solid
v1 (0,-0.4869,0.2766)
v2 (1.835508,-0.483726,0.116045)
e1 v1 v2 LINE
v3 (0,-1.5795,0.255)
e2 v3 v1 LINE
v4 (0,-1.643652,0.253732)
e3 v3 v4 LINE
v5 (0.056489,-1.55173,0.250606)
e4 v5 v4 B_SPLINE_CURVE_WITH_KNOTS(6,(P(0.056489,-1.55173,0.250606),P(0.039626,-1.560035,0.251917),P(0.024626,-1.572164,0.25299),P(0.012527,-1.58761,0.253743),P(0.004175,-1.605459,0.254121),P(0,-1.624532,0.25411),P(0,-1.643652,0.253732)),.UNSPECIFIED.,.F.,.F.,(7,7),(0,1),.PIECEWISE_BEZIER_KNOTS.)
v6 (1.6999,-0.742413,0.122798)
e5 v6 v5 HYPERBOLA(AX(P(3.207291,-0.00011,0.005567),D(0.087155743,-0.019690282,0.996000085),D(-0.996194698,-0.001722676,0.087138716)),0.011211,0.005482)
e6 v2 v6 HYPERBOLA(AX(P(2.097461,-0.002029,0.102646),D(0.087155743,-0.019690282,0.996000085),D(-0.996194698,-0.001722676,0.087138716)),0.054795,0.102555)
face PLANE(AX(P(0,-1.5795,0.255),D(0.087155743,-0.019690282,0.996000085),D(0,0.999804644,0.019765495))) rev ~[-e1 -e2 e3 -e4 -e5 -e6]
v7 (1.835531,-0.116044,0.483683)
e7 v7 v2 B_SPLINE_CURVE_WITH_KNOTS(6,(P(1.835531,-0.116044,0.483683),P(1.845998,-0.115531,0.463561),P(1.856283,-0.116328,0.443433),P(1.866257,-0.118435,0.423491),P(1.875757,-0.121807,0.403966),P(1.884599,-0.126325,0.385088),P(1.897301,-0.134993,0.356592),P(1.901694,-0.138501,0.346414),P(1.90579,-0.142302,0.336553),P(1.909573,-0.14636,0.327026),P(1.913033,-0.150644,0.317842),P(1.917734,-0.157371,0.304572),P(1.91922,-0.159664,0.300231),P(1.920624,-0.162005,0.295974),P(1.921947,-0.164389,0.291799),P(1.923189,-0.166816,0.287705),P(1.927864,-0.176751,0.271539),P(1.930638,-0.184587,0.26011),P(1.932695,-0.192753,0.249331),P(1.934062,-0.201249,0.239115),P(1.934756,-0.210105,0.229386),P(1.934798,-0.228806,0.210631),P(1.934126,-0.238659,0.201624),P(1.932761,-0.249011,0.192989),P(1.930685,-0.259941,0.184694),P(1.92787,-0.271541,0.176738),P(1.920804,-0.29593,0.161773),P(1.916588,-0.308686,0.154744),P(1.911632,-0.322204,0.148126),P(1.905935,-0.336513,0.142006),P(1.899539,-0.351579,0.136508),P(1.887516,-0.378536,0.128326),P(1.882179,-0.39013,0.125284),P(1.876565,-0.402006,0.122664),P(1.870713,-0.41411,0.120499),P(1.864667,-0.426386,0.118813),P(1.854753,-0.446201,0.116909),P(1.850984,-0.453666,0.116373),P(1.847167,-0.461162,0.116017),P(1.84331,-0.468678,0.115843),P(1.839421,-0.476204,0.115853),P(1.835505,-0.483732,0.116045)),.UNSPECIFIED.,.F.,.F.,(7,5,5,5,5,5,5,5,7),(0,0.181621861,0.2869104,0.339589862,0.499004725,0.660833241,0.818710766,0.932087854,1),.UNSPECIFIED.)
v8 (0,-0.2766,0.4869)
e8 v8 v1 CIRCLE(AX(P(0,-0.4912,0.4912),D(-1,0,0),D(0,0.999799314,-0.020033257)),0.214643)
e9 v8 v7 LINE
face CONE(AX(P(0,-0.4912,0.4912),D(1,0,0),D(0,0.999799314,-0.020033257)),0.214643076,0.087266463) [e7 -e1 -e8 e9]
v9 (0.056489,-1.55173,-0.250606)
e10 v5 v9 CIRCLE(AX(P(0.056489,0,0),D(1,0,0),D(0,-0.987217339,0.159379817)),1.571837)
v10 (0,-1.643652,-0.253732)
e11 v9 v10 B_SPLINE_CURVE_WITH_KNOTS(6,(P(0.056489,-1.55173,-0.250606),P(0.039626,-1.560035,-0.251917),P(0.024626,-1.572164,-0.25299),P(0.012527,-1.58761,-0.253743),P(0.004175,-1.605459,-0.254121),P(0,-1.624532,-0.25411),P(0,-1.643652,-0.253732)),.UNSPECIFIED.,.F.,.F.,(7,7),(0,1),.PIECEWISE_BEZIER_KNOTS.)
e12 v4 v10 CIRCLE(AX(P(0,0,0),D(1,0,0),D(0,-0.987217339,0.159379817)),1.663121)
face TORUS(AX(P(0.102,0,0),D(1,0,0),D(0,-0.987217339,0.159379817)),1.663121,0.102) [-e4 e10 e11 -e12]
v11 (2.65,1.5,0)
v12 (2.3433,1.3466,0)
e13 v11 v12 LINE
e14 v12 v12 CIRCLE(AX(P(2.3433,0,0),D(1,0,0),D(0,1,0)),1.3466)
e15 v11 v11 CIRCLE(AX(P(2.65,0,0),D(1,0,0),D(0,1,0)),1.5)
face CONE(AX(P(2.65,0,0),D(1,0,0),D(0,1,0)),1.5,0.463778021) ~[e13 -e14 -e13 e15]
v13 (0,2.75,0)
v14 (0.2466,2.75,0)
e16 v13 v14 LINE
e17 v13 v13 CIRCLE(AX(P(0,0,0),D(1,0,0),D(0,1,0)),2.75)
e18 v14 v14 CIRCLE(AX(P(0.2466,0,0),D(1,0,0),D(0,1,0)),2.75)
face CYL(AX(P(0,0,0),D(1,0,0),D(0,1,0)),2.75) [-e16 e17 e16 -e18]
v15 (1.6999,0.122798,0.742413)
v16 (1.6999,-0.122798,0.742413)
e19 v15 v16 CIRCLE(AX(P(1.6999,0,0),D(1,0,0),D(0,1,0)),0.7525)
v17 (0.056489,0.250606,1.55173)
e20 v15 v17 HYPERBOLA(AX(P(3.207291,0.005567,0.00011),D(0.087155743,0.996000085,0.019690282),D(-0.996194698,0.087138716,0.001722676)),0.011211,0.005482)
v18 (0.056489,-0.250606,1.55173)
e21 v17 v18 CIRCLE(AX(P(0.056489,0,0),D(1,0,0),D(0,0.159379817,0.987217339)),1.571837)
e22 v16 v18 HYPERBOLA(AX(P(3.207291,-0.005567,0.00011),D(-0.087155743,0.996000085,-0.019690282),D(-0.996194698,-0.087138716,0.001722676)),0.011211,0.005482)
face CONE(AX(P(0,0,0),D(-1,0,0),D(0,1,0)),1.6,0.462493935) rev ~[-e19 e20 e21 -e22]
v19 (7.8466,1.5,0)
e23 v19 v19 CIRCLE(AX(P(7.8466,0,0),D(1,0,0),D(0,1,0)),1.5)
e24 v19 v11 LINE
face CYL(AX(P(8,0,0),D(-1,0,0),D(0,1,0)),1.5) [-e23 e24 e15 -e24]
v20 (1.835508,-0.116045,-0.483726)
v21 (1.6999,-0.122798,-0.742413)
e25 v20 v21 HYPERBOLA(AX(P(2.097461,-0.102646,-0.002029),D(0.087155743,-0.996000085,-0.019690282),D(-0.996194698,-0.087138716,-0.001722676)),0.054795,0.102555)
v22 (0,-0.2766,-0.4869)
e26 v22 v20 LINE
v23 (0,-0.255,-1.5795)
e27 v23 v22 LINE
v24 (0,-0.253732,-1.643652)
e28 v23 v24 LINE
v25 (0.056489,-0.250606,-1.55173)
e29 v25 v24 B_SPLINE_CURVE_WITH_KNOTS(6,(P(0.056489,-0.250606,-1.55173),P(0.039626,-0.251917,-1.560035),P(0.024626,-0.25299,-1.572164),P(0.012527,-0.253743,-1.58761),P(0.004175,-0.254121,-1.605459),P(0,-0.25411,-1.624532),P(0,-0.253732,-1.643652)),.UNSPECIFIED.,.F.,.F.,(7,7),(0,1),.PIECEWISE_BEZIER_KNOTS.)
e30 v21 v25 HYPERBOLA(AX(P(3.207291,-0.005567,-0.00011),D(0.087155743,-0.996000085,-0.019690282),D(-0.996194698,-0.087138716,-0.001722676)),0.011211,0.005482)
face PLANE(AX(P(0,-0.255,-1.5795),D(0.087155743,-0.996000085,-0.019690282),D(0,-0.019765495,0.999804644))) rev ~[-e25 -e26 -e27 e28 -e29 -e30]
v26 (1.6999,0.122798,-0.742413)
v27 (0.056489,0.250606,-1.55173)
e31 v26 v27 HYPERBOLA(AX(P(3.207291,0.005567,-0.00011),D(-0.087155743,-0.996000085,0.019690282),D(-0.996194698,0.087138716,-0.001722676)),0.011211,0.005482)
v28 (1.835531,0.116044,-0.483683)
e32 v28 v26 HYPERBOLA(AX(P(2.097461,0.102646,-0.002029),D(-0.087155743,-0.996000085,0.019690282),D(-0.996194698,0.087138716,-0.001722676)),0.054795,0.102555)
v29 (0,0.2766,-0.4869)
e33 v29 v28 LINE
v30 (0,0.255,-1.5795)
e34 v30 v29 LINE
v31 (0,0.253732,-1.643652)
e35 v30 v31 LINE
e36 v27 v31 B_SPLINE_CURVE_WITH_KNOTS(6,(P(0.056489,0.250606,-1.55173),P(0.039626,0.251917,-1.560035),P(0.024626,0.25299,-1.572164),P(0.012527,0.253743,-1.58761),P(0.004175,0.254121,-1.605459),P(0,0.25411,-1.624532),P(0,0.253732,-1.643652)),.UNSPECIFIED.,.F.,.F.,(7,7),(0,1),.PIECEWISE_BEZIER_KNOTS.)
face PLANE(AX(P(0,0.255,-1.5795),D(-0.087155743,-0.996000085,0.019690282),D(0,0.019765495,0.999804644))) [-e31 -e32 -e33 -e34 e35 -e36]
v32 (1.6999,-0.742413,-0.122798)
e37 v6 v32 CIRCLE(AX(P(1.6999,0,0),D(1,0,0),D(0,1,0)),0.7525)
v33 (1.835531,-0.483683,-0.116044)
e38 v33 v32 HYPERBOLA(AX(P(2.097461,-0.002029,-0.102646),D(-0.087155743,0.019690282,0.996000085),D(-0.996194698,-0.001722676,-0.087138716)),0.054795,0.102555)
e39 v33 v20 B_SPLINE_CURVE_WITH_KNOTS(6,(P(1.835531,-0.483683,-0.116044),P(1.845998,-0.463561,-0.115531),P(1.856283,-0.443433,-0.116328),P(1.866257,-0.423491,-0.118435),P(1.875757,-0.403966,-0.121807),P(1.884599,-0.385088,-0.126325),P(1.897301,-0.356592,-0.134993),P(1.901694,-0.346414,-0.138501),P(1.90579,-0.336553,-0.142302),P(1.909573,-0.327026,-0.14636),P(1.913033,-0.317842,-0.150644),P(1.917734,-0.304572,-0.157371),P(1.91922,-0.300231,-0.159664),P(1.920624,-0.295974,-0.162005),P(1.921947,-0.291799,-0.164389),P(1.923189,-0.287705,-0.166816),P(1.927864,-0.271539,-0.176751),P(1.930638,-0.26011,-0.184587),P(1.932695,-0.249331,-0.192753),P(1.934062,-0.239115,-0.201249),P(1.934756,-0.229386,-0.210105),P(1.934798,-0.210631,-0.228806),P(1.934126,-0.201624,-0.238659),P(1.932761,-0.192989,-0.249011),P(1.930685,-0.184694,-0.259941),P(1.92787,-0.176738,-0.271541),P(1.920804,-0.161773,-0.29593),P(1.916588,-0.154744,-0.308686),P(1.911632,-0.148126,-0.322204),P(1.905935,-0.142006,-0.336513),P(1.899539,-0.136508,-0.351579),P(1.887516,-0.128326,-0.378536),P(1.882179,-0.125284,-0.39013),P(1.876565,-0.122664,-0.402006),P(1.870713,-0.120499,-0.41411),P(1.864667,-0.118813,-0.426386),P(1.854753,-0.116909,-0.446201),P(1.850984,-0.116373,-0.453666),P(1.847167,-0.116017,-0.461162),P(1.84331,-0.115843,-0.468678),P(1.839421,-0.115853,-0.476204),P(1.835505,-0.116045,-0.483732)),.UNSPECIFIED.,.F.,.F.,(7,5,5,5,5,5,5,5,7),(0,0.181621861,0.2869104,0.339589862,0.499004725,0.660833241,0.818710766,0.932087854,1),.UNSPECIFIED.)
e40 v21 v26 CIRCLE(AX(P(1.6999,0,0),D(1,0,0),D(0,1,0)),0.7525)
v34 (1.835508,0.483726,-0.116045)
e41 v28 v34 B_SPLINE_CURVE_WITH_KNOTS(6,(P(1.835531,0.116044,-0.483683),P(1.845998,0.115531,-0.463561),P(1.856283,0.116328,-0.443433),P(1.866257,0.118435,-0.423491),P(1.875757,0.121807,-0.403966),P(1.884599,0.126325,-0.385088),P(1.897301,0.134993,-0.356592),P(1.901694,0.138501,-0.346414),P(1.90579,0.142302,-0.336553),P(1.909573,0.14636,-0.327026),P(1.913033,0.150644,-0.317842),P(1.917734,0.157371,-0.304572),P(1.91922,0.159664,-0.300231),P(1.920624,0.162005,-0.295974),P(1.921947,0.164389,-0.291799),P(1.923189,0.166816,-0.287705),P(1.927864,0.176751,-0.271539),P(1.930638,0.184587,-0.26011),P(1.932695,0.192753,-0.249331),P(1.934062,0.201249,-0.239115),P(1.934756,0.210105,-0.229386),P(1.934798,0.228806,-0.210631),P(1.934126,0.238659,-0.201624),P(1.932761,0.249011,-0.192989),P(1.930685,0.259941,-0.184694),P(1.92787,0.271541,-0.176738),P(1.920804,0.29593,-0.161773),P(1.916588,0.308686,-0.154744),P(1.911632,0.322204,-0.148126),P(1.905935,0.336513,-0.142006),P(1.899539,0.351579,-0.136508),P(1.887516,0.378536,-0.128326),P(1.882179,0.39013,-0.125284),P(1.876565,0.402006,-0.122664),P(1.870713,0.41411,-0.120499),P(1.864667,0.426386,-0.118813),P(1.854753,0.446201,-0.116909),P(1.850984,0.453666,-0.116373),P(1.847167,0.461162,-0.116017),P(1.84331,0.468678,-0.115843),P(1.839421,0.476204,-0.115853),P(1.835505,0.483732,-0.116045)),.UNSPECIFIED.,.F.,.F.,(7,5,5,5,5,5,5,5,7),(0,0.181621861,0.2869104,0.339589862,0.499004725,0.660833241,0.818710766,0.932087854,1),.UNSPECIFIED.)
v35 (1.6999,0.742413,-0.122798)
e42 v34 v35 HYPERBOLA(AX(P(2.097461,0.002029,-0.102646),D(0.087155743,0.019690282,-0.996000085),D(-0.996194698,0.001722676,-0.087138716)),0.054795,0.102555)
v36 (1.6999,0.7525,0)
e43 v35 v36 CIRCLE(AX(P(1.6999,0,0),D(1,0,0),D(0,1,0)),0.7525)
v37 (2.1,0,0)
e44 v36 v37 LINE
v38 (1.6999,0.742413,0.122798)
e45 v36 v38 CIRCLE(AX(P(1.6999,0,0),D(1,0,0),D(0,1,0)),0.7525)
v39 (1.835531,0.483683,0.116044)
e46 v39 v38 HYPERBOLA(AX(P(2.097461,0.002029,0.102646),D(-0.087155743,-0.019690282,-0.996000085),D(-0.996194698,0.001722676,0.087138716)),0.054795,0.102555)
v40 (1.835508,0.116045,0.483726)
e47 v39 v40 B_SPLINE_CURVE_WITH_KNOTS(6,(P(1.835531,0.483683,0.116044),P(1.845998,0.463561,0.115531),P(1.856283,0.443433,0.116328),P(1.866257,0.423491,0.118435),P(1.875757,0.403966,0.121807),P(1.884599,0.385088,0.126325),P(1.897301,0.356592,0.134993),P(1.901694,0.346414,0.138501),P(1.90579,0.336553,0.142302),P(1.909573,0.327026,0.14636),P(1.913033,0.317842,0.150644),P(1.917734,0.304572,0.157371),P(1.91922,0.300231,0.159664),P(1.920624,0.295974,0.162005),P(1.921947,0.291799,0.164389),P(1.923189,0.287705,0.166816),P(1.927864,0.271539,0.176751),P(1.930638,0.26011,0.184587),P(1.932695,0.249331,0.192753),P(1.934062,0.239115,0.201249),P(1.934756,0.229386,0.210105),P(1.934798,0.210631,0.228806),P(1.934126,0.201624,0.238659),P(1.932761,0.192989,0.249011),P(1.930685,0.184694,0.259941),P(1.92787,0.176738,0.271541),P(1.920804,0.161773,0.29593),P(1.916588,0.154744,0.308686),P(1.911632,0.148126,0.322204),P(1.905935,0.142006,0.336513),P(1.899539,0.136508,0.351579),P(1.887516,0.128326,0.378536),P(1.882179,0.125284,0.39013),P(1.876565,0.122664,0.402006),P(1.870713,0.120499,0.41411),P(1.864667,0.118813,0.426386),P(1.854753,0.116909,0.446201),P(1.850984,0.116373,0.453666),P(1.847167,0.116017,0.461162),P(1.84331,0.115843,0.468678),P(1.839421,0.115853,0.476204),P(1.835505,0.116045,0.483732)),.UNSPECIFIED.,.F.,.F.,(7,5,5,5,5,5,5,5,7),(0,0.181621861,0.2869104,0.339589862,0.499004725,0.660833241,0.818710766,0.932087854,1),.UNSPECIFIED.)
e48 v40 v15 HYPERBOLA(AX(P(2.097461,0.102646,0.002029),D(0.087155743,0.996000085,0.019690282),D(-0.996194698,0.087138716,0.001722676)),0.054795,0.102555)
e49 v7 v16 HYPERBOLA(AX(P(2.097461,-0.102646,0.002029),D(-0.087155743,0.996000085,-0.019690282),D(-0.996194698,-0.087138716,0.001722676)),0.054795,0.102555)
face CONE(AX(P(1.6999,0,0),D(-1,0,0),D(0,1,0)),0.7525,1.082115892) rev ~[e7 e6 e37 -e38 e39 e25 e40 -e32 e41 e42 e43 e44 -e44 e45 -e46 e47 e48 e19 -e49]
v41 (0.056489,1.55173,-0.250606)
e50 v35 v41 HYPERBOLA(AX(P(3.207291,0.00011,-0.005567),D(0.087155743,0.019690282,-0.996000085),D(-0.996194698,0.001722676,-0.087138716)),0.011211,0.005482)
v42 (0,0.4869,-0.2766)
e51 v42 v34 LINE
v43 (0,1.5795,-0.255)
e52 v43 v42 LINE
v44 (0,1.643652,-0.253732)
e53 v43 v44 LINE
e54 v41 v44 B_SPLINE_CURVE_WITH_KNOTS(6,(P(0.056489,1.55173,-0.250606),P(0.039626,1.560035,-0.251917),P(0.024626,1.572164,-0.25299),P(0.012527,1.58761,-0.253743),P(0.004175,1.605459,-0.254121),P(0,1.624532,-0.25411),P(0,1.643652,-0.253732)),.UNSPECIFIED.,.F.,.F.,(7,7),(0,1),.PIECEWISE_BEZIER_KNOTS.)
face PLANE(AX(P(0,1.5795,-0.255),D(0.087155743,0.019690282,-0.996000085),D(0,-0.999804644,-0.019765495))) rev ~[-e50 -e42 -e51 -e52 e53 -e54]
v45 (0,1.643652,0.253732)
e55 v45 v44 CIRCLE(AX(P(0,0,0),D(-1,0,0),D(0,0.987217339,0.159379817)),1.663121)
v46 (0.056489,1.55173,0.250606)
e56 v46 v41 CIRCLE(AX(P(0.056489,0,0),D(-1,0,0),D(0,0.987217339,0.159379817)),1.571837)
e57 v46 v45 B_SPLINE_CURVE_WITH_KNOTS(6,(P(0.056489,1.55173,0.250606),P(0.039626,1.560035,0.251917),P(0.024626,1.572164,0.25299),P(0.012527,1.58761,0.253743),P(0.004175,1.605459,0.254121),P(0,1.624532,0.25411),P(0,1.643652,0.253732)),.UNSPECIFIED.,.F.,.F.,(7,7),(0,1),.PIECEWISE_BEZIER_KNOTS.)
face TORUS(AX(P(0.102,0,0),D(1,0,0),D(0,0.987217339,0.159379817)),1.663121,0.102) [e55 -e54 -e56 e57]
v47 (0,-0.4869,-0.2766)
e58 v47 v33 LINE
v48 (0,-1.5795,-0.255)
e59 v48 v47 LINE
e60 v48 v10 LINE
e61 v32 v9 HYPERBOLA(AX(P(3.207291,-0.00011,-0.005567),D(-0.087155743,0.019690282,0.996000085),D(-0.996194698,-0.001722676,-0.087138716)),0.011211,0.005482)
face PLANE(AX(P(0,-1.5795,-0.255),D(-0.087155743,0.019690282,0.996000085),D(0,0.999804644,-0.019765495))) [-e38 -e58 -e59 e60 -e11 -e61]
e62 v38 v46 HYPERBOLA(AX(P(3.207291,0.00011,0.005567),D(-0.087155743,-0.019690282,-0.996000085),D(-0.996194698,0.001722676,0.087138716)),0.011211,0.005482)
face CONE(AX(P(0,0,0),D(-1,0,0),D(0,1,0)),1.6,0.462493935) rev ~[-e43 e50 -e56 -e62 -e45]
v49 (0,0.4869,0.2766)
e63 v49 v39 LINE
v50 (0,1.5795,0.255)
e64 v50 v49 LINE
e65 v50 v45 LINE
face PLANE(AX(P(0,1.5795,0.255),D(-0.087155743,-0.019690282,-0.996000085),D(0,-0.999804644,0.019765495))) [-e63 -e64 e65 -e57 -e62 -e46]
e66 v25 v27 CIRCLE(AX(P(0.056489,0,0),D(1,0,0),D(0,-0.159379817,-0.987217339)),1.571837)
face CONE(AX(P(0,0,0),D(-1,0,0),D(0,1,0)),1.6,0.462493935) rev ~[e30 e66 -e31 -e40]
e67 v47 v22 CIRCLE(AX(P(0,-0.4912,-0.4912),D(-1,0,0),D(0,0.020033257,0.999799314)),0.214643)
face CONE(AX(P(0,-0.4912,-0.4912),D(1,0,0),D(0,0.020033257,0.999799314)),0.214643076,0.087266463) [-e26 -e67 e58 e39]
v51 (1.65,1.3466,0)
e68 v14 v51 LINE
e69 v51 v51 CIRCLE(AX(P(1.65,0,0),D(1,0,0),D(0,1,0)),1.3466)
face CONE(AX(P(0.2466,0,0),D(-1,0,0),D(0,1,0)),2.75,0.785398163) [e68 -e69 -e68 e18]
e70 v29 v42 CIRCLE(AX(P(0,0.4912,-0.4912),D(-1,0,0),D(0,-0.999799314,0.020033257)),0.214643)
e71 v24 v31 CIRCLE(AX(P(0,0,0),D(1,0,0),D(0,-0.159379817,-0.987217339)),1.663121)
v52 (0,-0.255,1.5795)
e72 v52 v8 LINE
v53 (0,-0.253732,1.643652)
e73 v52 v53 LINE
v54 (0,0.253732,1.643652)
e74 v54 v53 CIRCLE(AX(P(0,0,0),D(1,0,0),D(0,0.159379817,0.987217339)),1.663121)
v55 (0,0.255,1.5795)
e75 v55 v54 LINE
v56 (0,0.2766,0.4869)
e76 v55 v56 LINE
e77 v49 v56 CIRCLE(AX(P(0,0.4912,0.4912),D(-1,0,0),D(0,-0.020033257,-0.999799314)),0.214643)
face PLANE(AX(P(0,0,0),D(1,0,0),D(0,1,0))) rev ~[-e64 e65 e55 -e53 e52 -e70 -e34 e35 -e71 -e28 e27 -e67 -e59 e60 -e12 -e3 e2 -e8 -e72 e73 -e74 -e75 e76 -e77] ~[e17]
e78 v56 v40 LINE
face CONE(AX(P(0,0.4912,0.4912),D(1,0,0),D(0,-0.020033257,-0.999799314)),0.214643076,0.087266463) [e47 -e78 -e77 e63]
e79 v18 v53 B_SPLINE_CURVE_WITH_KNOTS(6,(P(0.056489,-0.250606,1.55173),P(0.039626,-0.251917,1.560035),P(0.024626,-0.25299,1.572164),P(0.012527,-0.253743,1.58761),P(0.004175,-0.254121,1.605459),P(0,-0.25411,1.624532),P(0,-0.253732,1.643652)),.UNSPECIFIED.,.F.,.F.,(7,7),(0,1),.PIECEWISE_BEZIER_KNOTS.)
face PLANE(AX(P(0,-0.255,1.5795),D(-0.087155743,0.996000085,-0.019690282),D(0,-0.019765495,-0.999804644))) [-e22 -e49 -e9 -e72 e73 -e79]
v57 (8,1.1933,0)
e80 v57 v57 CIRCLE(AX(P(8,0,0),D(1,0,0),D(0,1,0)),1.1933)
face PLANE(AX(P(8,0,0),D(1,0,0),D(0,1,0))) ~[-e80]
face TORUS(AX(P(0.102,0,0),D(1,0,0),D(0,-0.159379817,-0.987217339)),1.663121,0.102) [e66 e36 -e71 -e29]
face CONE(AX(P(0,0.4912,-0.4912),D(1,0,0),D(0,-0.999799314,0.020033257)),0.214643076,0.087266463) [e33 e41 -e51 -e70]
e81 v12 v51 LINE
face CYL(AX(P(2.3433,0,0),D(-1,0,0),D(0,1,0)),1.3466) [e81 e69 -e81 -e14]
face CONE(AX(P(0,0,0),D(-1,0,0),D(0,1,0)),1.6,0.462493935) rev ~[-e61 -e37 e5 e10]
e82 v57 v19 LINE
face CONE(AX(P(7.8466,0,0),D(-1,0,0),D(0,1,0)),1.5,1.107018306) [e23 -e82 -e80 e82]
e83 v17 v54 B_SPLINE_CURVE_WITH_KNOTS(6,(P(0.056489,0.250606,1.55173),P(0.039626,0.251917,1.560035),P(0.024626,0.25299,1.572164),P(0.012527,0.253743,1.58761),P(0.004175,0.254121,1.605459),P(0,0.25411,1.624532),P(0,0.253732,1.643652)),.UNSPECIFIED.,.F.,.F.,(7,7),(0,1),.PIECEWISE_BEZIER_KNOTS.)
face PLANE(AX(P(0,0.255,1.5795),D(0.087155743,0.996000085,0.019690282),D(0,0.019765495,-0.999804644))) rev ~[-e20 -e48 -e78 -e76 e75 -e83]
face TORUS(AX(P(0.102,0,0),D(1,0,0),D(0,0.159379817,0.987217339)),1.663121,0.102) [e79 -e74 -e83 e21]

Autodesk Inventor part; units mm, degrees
ref_plane "YZ Plane" through (0, 0, 0) normal (1, 0, 0) x (0, 1, 0)
ref_plane "XZ Plane" through (0, 0, 0) normal (0, 1, 0) x (-1, 0, 0)
sketch "Эскиз1" plane through (0, 0, 0) normal (0, 0, 1) x (1, 0, 0)
  line L0 (2.1, 0) -> (8, 0)
  line L1 (8, 0) -> (8, 1.5)
  line L2 (8, 1.5) -> (2.65, 1.5)
  line L3 (2.65, 1.5) -> (2.3433, 1.3466)
  line L4 (2.3433, 1.3466) -> (1.65, 1.3466)
  line L5 (0, 2.75) -> (0, 1.6)
  line L6 (0, 1.6) -> (1.6999, 0.7525)
  line L7 (1.6999, 0.7525) -> (2.1, 0)
  line L8 (-1.6, 0) -> (9.6, 0) projected
  line L9 (0, -0.55) -> (0, 3.3) projected
  line L10 (0, 2.75) -> (0.2466, 2.75)
  line L11 (0.2466, 2.75) -> (1.65, 1.3466)
  line L12 (2.65, 1.5) -> (1.4966, 1.5) construction
  dimension "d1" = 5.35
  dimension "d2" = 3
  dimension "d3" = 2.6933
  dimension "d4" = 3.2
  dimension "d5" = 26.5
  dimension "d6" = 62
  dimension "d7" = 2.1
  dimension "d8" = 0.3067
  dimension "d12" = 5.5
  dimension "d13" = 45
  dimension "d15" = 8
  dimension "d24" = 1.65
revolve "Базовый элемент" add sketch "Эскиз1" angle 360 about axis through (2.1, 0, 0) along (1, 0, 0) contours L7 L6 L5 L10 L11 L4 L3 L2 L1 L0
sketch "Эскиз2" plane through (0, 0, 0) normal (-1, 0, 0) x (0, 0, 1)
  line L0 (0, 1.6) -> (0, 0) construction
  line L1 (0, 0) -> (1.6, 0) construction
  arc A0 (0.48, 0) -> (0, 0.48) centre (0, 0) ccw construction
  arc A1 (0.56, 0) -> (0, 0.56) centre (0, 0) ccw construction
  arc A2 (1.5795, 0.255) -> (0.255, 1.5795) centre (0, 0) ccw
  line L2 (0, 0) -> (1.1314, 1.1314) construction
  line L3 (0.255, 1.5795) -> (0.2766, 0.4869)
  line L4 (1.5795, 0.255) -> (0.4869, 0.2766)
  arc A3 (0.255, 1.5795) -> (0, 1.6) centre (0, 0) ccw
  arc A4 (1.6, 0) -> (1.5795, 0.255) centre (0, 0) ccw
  line L5 (0, -3.85) -> (0, 3.85) projected
  line L6 (-3.85, 0) -> (3.85, 0) projected
  arc A5 (0.255, -1.5795) -> (1.5795, -0.255) centre (0, 0) ccw
  line L7 (0.255, -1.5795) -> (0.2766, -0.4869)
  line L8 (1.5795, -0.255) -> (0.4869, -0.2766)
  arc A6 (0, -1.6) -> (0.255, -1.5795) centre (0, 0) ccw
  arc A7 (1.5795, -0.255) -> (1.6, 0) centre (0, 0) ccw
  arc A8 (-0.255, 1.5795) -> (-1.5795, 0.255) centre (0, 0) ccw
  line L9 (-0.255, 1.5795) -> (-0.2766, 0.4869)
  line L10 (-1.5795, 0.255) -> (-0.4869, 0.2766)
  arc A9 (0, 1.6) -> (-0.255, 1.5795) centre (0, 0) ccw
  arc A10 (-1.5795, 0.255) -> (-1.6, 0) centre (0, 0) ccw
  arc A11 (-0.255, -1.5795) -> (0, -1.6) centre (0, 0) ccw
  arc A12 (-1.5795, -0.255) -> (-0.255, -1.5795) centre (0, 0) ccw
  arc A13 (-1.6, 0) -> (-1.5795, -0.255) centre (0, 0) ccw
  line L11 (-1.5795, -0.255) -> (-0.4869, -0.2766)
  line L12 (-0.255, -1.5795) -> (-0.2766, -0.4869)
  arc A14 (0.2766, 0.4869) -> (0.4869, 0.2766) centre (0.4912, 0.4912) ccw
  arc A15 (0.4869, -0.2766) -> (0.2766, -0.4869) centre (0.4912, -0.4912) ccw
  arc A16 (-0.4869, 0.2766) -> (-0.2766, 0.4869) centre (-0.4912, 0.4912) ccw
  arc A17 (-0.2766, -0.4869) -> (-0.4869, -0.2766) centre (-0.4912, -0.4912) ccw
  point P0 (1.1314, -1.1314)
  point P1 (-1.1314, 1.1314)
  point P2 (-1.1314, -1.1314)
  dimension "d17" = 0.96
  dimension "d18" = 1.12
  dimension "d19" = 3.2
  dimension "d20" = 45
  dimension "d21" = 0.255
extrude "Паз" add sketch "Эскиз2" against normal up to next draft 5 contours L4 A14 L3 A2 | A5 L7 A15 L8 | L9 A16 L10 A8 | A12 L11 A17 L12
fillet "Сопряжение1" radius 0.102 4 edges at (0, 1.6, 0) (0, 0, -1.6) (0, -1.6, 0) (0, 0, 1.6)
thread "Резьба" size "M3x0.5" class "6g" standard "ISO Metric profile" length 5.35
chamfer "Фаска1" distance 0.3067 distance2 0.1534 1 edges at (8, -1.5, 0) measured on face at (8, 0.3888, 0.4512)
ref_plane "Work Plane2" through (3.35, 0, 0) normal (0, 0, -1) x (1, 0, 0)
equation "\"d1\" = GEL"
equation "\"d2\" = GD"
equation "\"d3\" = BDM"
equation "\"d4\" = SDM"
equation "\"d7\" = INTI"
equation "\"d8\" = GAL"
equation "\"d12\" = KOD"
equation "\"d13\" = 0.5 * SEWI"
equation "\"d15\" = NLG"
equation "\"d24\" = KOH"
equation "\"d17\" = 0.3 * SDM"
equation "\"d18\" = 0.35 * SDM"
equation "\"d19\" = SDM"
equation "\"d21\" = 0.5 * SBR"
equation "\"d23\" = 0.2 * SBR"
equation "\"d10\" = GEL"
equation "\"d25\" = -0.5 * SPD + 0.5 * GD"
equation "\"d26\" = 0.5 * GAL"
equation "\"NLG\" = 8"
equation "\"GEL\" = 5.35"
equation "\"GAL\" = 0.61345 * PTC"
equation "\"SPD\" = NND - 1.2269 * PTC"
equation "\"KOD\" = 5.5"
equation "\"KOH\" = 1.65"
equation "\"SBR\" = 0.51"
equation "\"INTI\" = 2.1"
equation "\"SDM\" = 3.2"
equation "\"GD\" = NND"
equation "\"BDM\" = NND - GAL"
equation "\"SEWI\" = 90deg"
equation "\"d9\" = SDM"
equation "\"GUL\" = 0.61345 * PTC"
equation "\"TOA\" = 30deg"
equation "\"EPV\" = 3.15"
equation "\"THREADDIA\" = 3"
equation "\"PTC\" = 0.5"
equation "\"NND\" = 3"
equation "\"GD1\" = THREADDIA - 1.2269 * PTC"
properties part number "ISO 7046-1 - M3 x 8 - 4.8 - H" material "Сталь"
